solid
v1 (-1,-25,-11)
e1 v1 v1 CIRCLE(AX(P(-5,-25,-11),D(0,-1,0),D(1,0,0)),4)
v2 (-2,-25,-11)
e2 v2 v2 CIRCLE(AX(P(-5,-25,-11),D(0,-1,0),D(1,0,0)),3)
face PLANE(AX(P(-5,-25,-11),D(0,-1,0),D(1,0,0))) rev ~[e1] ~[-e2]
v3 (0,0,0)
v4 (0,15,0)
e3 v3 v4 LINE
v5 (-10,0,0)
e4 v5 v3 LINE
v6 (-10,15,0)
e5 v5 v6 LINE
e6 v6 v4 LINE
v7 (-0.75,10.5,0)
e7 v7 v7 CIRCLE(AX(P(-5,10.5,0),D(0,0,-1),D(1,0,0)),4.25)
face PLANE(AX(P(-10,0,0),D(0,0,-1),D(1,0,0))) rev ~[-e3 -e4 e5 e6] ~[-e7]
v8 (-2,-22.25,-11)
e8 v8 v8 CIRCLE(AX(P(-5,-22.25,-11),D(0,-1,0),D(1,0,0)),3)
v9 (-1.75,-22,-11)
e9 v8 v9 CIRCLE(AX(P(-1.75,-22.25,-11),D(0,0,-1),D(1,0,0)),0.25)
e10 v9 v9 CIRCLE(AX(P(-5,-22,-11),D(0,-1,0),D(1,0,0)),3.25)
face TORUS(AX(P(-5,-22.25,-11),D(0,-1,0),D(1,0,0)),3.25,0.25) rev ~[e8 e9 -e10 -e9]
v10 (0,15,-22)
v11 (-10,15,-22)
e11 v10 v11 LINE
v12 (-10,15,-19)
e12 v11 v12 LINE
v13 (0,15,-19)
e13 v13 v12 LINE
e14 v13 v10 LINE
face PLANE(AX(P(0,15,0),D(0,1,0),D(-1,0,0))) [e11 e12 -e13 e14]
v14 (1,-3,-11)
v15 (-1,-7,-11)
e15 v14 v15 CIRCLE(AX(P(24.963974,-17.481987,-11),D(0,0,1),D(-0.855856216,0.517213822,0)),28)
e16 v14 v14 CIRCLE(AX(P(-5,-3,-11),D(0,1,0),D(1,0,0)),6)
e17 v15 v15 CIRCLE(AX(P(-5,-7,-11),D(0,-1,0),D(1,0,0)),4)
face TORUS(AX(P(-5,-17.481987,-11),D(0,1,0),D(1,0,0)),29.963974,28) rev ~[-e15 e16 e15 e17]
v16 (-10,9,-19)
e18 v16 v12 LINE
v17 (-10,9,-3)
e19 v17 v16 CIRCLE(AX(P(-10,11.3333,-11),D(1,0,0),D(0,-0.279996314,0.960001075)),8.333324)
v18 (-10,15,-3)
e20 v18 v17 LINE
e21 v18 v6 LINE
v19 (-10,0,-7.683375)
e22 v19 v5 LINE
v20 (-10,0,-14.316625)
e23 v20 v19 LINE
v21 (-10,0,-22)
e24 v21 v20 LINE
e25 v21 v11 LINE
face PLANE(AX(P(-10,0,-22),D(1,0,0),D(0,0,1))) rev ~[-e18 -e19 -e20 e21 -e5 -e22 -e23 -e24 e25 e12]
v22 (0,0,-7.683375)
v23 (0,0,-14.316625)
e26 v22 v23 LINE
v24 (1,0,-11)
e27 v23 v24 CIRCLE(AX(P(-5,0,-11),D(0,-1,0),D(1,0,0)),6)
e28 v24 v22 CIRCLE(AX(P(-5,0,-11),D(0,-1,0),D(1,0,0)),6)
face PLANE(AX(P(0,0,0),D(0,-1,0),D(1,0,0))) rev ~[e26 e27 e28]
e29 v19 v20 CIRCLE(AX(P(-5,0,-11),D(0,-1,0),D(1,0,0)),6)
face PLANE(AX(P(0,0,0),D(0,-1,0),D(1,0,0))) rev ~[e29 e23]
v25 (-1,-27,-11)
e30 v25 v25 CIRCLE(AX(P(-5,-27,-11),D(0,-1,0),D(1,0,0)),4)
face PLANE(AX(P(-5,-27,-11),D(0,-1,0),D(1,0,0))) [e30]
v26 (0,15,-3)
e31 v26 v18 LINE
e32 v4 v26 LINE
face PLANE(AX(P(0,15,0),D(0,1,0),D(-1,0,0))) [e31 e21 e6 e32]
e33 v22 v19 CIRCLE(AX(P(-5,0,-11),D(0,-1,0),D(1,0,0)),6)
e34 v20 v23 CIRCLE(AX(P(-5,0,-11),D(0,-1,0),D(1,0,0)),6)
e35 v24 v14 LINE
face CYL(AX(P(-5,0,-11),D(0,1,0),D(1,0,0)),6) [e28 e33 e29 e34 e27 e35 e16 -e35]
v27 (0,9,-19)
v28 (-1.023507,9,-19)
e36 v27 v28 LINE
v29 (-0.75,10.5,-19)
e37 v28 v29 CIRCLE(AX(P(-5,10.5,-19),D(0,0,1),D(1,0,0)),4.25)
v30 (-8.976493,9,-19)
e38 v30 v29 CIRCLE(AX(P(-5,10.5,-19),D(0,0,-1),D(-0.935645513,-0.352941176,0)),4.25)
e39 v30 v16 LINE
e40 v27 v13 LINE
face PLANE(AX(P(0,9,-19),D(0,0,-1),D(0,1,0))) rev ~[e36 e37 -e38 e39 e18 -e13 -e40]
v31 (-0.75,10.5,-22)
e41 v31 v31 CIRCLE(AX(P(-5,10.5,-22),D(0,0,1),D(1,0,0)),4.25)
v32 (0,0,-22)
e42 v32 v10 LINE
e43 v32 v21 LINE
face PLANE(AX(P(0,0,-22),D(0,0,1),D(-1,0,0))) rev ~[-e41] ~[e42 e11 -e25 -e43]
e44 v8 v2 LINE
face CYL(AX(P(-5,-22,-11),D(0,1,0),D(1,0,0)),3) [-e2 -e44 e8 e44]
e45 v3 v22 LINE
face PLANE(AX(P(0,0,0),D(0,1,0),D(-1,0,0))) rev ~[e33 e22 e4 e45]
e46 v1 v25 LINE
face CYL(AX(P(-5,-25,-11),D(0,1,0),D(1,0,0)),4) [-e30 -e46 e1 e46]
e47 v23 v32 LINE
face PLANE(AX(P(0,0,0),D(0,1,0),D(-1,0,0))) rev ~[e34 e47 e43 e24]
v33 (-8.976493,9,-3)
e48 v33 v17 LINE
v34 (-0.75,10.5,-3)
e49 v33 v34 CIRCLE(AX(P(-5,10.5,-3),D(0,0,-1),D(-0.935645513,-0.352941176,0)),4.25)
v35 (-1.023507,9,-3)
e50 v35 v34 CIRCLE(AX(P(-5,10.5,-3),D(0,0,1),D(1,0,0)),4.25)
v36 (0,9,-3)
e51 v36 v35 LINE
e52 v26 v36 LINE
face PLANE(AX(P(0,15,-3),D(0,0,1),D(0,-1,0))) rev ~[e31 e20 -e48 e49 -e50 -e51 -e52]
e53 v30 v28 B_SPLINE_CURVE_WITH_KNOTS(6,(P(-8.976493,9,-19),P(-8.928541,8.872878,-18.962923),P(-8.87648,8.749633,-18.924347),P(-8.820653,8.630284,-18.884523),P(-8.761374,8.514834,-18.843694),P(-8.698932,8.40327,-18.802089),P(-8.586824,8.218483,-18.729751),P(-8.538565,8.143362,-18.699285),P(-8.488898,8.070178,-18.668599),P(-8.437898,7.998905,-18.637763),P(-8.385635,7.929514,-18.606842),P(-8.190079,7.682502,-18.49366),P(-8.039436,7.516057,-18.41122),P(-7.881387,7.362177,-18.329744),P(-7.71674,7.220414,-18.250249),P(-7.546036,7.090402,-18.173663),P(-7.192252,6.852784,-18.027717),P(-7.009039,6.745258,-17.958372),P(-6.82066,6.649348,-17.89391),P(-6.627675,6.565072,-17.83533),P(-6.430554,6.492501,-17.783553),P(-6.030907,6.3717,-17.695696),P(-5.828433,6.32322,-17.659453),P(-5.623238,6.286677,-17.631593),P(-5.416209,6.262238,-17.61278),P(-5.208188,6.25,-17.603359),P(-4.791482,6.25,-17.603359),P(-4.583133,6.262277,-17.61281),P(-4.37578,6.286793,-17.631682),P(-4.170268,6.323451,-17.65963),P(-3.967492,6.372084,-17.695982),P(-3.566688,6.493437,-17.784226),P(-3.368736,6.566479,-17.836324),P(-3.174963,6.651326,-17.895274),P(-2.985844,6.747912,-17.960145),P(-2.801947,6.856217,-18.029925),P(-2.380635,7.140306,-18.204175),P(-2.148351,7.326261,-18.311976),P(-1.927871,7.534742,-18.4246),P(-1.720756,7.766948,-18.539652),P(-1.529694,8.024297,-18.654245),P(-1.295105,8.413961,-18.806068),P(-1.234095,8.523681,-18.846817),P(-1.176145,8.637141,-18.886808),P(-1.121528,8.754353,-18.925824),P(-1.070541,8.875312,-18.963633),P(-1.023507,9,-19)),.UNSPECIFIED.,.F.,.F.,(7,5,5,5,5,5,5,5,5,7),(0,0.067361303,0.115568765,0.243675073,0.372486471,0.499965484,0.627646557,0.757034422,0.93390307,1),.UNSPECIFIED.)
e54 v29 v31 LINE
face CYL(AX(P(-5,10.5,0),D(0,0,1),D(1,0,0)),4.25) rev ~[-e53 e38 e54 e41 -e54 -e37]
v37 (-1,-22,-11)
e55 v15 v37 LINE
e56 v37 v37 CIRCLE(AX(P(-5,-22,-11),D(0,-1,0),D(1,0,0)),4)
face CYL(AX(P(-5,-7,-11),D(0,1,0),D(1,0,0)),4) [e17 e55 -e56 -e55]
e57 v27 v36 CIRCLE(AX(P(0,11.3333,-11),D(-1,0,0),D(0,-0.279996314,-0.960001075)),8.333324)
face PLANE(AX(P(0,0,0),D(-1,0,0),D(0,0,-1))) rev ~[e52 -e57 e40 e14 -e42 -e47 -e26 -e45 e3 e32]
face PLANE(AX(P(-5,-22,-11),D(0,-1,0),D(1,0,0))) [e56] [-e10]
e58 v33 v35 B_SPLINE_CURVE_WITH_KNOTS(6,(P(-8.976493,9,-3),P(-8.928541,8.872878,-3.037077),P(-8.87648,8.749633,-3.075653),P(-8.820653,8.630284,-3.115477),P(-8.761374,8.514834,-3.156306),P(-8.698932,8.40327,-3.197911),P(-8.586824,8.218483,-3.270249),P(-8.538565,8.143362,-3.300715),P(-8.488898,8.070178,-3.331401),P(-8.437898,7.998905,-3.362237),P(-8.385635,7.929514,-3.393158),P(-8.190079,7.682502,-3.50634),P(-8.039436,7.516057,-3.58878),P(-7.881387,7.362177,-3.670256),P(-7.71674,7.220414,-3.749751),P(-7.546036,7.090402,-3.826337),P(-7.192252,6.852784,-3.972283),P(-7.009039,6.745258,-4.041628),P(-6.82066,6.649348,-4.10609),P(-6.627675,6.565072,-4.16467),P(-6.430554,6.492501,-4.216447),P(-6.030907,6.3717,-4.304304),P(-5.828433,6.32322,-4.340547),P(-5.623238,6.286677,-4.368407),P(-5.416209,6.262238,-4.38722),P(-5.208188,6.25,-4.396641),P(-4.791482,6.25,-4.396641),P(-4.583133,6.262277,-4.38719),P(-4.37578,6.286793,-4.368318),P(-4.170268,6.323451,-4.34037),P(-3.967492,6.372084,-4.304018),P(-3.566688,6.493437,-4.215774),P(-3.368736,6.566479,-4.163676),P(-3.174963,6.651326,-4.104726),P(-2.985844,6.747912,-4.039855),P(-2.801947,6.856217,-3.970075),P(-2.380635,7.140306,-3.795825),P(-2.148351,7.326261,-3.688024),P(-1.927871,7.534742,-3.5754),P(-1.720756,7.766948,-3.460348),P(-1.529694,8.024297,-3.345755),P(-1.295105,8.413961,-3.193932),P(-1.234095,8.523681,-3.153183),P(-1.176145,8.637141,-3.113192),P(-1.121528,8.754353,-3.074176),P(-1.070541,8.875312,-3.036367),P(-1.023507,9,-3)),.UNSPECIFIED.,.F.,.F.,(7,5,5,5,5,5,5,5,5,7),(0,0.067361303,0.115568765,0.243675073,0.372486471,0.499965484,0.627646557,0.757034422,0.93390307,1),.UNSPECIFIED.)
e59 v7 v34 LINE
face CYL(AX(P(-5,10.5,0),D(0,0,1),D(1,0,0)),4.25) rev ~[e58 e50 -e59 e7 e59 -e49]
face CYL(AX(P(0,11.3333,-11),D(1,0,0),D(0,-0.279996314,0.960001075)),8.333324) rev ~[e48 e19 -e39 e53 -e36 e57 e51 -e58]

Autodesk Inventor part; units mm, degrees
ref_plane "YZ Plane" through (0, 0, 0) normal (1, 0, 0) x (0, 1, 0)
ref_plane "XZ Plane" through (0, 0, 0) normal (0, 1, 0) x (-1, 0, 0)
ref_plane "XY Plane" through (0, 0, 0) normal (0, 0, 1) x (1, 0, 0)
sketch "Sketch1" plane through (0, 0, 0) normal (0, 0, 1) x (1, 0, 0)
  point P0 (0, 0)
sketch "Sketch2" plane through (0, 0, 0) normal (0, 1, 0) x (-1, 0, 0)
  line L0 (0, 0) -> (0, -22)
  line L1 (0, -22) -> (10, -22)
  line L2 (10, -22) -> (10, 0)
  line L3 (10, 0) -> (0, 0)
  dimension "d0" = 22
  dimension "d1" = 10
extrude "Extrusion1" add sketch "Sketch2" along normal blind 15
sketch "Sketch5" plane through (0, 0, 0) normal (1, 0, 0) x (0, 0, -1)
  line L0 (0, 0) -> (22, 0) projected
  line L1 (22, 0) -> (22, 15) projected
  line L2 (0, 15) -> (22, 15) projected
  line L3 (0, 0) -> (0, 15) projected
  line L4 (22, 15) -> (0, 15) projected
  line L5 (0, 15) -> (3, 15)
  line L6 (22, 15) -> (19, 15)
  line L7 (22, 0) -> (0, 0) projected
  line L8 (11, 0) -> (11, 3)
  line L9 (3, 15) -> (3, 9)
  line L10 (3, 9) -> (19, 9)
  line L11 (19, 9) -> (19, 15)
  arc A0 (3, 9) -> (19, 9) centre (11, 11.3333) ccw
  dimension "d4" = 3
  dimension "d5" = 3
  dimension "d7" = 3
  dimension "d8" = 6
extrude "Extrusion2" cut sketch "Sketch5" against normal blind 17 contours A0 L10 | L2 L11 L10 L9
sketch "Sketch6" plane through (-10, 0, 0) normal (0, 0, 1) x (1, 0, 0)
  line L0 (0, 0) -> (10, 0) projected
  line L1 (10, 0) -> (10, 15) projected
  line L2 (0, 15) -> (10, 15) projected
  line L3 (0, 0) -> (0, 15) projected
  line L4 (0, 15) -> (10, 15) projected
  line L5 (5, 15) -> (5, 10.5)
  circle A0 centre (5, 10.5) radius 4.25
  dimension "d11" = 4.5
  dimension "d12" = 8.5
extrude "Extrusion3" cut sketch "Sketch6" against normal blind 31.25 contours A0
sketch "Sketch7" plane through (0, 0, 0) normal (0, -1, 0) x (1, 0, 0)
  line L0 (0, -22) -> (-10, -22) projected
  line L1 (0, 0) -> (0, -22) projected
  line L2 (-10, 0) -> (0, 0) projected
  line L3 (-10, -22) -> (-10, 0) projected
  line L4 (0, -3) -> (0, -19) projected
  circle A0 centre (-5, -11) radius 6
  dimension "d15" = 12
extrude "Extrusion4" add sketch "Sketch7" along normal blind 3 contours A0 L3 | L3 A0 L1 | L1 A0
sketch "Sketch8" plane through (-5, -3, -11) normal (0, -1, 0) x (1, 0, 0)
  circle A0 centre (0, 0) radius 6 projected
  circle A1 centre (0, 0) radius 4
  point P0 (5, 11)
  dimension "d18" = 8
extrude "Extrusion5" add sketch "Sketch8" along normal blind 4 contours A1
fillet "Fillet1" radius 28 1 edges at (-9, -3, -11)
sketch "Sketch11" plane through (-5, -7, -11) normal (0, -1, 0) x (1, 0, 0)
  circle A0 centre (0, 0) radius 4
  point P0 (5, 11)
extrude "Extrusion6" add sketch "Sketch11" along normal blind 15
sketch "Sketch12" plane through (-5, -22, -11) normal (0, -1, 0) x (1, 0, 0)
  circle A0 centre (0, 0) radius 3
  point P0 (5, 11)
  dimension "d24" = 6
extrude "Extrusion7" add sketch "Sketch12" along normal blind 3
sketch "Sketch13" plane through (-5, -25, -11) normal (0, -1, 0) x (1, 0, 0)
  circle A0 centre (0, 0) radius 4
  point P0 (5, 11)
extrude "Extrusion8" add sketch "Sketch13" along normal blind 2
fillet "Fillet2" radius 0.25 1 edges at (-8, -22, -11)
